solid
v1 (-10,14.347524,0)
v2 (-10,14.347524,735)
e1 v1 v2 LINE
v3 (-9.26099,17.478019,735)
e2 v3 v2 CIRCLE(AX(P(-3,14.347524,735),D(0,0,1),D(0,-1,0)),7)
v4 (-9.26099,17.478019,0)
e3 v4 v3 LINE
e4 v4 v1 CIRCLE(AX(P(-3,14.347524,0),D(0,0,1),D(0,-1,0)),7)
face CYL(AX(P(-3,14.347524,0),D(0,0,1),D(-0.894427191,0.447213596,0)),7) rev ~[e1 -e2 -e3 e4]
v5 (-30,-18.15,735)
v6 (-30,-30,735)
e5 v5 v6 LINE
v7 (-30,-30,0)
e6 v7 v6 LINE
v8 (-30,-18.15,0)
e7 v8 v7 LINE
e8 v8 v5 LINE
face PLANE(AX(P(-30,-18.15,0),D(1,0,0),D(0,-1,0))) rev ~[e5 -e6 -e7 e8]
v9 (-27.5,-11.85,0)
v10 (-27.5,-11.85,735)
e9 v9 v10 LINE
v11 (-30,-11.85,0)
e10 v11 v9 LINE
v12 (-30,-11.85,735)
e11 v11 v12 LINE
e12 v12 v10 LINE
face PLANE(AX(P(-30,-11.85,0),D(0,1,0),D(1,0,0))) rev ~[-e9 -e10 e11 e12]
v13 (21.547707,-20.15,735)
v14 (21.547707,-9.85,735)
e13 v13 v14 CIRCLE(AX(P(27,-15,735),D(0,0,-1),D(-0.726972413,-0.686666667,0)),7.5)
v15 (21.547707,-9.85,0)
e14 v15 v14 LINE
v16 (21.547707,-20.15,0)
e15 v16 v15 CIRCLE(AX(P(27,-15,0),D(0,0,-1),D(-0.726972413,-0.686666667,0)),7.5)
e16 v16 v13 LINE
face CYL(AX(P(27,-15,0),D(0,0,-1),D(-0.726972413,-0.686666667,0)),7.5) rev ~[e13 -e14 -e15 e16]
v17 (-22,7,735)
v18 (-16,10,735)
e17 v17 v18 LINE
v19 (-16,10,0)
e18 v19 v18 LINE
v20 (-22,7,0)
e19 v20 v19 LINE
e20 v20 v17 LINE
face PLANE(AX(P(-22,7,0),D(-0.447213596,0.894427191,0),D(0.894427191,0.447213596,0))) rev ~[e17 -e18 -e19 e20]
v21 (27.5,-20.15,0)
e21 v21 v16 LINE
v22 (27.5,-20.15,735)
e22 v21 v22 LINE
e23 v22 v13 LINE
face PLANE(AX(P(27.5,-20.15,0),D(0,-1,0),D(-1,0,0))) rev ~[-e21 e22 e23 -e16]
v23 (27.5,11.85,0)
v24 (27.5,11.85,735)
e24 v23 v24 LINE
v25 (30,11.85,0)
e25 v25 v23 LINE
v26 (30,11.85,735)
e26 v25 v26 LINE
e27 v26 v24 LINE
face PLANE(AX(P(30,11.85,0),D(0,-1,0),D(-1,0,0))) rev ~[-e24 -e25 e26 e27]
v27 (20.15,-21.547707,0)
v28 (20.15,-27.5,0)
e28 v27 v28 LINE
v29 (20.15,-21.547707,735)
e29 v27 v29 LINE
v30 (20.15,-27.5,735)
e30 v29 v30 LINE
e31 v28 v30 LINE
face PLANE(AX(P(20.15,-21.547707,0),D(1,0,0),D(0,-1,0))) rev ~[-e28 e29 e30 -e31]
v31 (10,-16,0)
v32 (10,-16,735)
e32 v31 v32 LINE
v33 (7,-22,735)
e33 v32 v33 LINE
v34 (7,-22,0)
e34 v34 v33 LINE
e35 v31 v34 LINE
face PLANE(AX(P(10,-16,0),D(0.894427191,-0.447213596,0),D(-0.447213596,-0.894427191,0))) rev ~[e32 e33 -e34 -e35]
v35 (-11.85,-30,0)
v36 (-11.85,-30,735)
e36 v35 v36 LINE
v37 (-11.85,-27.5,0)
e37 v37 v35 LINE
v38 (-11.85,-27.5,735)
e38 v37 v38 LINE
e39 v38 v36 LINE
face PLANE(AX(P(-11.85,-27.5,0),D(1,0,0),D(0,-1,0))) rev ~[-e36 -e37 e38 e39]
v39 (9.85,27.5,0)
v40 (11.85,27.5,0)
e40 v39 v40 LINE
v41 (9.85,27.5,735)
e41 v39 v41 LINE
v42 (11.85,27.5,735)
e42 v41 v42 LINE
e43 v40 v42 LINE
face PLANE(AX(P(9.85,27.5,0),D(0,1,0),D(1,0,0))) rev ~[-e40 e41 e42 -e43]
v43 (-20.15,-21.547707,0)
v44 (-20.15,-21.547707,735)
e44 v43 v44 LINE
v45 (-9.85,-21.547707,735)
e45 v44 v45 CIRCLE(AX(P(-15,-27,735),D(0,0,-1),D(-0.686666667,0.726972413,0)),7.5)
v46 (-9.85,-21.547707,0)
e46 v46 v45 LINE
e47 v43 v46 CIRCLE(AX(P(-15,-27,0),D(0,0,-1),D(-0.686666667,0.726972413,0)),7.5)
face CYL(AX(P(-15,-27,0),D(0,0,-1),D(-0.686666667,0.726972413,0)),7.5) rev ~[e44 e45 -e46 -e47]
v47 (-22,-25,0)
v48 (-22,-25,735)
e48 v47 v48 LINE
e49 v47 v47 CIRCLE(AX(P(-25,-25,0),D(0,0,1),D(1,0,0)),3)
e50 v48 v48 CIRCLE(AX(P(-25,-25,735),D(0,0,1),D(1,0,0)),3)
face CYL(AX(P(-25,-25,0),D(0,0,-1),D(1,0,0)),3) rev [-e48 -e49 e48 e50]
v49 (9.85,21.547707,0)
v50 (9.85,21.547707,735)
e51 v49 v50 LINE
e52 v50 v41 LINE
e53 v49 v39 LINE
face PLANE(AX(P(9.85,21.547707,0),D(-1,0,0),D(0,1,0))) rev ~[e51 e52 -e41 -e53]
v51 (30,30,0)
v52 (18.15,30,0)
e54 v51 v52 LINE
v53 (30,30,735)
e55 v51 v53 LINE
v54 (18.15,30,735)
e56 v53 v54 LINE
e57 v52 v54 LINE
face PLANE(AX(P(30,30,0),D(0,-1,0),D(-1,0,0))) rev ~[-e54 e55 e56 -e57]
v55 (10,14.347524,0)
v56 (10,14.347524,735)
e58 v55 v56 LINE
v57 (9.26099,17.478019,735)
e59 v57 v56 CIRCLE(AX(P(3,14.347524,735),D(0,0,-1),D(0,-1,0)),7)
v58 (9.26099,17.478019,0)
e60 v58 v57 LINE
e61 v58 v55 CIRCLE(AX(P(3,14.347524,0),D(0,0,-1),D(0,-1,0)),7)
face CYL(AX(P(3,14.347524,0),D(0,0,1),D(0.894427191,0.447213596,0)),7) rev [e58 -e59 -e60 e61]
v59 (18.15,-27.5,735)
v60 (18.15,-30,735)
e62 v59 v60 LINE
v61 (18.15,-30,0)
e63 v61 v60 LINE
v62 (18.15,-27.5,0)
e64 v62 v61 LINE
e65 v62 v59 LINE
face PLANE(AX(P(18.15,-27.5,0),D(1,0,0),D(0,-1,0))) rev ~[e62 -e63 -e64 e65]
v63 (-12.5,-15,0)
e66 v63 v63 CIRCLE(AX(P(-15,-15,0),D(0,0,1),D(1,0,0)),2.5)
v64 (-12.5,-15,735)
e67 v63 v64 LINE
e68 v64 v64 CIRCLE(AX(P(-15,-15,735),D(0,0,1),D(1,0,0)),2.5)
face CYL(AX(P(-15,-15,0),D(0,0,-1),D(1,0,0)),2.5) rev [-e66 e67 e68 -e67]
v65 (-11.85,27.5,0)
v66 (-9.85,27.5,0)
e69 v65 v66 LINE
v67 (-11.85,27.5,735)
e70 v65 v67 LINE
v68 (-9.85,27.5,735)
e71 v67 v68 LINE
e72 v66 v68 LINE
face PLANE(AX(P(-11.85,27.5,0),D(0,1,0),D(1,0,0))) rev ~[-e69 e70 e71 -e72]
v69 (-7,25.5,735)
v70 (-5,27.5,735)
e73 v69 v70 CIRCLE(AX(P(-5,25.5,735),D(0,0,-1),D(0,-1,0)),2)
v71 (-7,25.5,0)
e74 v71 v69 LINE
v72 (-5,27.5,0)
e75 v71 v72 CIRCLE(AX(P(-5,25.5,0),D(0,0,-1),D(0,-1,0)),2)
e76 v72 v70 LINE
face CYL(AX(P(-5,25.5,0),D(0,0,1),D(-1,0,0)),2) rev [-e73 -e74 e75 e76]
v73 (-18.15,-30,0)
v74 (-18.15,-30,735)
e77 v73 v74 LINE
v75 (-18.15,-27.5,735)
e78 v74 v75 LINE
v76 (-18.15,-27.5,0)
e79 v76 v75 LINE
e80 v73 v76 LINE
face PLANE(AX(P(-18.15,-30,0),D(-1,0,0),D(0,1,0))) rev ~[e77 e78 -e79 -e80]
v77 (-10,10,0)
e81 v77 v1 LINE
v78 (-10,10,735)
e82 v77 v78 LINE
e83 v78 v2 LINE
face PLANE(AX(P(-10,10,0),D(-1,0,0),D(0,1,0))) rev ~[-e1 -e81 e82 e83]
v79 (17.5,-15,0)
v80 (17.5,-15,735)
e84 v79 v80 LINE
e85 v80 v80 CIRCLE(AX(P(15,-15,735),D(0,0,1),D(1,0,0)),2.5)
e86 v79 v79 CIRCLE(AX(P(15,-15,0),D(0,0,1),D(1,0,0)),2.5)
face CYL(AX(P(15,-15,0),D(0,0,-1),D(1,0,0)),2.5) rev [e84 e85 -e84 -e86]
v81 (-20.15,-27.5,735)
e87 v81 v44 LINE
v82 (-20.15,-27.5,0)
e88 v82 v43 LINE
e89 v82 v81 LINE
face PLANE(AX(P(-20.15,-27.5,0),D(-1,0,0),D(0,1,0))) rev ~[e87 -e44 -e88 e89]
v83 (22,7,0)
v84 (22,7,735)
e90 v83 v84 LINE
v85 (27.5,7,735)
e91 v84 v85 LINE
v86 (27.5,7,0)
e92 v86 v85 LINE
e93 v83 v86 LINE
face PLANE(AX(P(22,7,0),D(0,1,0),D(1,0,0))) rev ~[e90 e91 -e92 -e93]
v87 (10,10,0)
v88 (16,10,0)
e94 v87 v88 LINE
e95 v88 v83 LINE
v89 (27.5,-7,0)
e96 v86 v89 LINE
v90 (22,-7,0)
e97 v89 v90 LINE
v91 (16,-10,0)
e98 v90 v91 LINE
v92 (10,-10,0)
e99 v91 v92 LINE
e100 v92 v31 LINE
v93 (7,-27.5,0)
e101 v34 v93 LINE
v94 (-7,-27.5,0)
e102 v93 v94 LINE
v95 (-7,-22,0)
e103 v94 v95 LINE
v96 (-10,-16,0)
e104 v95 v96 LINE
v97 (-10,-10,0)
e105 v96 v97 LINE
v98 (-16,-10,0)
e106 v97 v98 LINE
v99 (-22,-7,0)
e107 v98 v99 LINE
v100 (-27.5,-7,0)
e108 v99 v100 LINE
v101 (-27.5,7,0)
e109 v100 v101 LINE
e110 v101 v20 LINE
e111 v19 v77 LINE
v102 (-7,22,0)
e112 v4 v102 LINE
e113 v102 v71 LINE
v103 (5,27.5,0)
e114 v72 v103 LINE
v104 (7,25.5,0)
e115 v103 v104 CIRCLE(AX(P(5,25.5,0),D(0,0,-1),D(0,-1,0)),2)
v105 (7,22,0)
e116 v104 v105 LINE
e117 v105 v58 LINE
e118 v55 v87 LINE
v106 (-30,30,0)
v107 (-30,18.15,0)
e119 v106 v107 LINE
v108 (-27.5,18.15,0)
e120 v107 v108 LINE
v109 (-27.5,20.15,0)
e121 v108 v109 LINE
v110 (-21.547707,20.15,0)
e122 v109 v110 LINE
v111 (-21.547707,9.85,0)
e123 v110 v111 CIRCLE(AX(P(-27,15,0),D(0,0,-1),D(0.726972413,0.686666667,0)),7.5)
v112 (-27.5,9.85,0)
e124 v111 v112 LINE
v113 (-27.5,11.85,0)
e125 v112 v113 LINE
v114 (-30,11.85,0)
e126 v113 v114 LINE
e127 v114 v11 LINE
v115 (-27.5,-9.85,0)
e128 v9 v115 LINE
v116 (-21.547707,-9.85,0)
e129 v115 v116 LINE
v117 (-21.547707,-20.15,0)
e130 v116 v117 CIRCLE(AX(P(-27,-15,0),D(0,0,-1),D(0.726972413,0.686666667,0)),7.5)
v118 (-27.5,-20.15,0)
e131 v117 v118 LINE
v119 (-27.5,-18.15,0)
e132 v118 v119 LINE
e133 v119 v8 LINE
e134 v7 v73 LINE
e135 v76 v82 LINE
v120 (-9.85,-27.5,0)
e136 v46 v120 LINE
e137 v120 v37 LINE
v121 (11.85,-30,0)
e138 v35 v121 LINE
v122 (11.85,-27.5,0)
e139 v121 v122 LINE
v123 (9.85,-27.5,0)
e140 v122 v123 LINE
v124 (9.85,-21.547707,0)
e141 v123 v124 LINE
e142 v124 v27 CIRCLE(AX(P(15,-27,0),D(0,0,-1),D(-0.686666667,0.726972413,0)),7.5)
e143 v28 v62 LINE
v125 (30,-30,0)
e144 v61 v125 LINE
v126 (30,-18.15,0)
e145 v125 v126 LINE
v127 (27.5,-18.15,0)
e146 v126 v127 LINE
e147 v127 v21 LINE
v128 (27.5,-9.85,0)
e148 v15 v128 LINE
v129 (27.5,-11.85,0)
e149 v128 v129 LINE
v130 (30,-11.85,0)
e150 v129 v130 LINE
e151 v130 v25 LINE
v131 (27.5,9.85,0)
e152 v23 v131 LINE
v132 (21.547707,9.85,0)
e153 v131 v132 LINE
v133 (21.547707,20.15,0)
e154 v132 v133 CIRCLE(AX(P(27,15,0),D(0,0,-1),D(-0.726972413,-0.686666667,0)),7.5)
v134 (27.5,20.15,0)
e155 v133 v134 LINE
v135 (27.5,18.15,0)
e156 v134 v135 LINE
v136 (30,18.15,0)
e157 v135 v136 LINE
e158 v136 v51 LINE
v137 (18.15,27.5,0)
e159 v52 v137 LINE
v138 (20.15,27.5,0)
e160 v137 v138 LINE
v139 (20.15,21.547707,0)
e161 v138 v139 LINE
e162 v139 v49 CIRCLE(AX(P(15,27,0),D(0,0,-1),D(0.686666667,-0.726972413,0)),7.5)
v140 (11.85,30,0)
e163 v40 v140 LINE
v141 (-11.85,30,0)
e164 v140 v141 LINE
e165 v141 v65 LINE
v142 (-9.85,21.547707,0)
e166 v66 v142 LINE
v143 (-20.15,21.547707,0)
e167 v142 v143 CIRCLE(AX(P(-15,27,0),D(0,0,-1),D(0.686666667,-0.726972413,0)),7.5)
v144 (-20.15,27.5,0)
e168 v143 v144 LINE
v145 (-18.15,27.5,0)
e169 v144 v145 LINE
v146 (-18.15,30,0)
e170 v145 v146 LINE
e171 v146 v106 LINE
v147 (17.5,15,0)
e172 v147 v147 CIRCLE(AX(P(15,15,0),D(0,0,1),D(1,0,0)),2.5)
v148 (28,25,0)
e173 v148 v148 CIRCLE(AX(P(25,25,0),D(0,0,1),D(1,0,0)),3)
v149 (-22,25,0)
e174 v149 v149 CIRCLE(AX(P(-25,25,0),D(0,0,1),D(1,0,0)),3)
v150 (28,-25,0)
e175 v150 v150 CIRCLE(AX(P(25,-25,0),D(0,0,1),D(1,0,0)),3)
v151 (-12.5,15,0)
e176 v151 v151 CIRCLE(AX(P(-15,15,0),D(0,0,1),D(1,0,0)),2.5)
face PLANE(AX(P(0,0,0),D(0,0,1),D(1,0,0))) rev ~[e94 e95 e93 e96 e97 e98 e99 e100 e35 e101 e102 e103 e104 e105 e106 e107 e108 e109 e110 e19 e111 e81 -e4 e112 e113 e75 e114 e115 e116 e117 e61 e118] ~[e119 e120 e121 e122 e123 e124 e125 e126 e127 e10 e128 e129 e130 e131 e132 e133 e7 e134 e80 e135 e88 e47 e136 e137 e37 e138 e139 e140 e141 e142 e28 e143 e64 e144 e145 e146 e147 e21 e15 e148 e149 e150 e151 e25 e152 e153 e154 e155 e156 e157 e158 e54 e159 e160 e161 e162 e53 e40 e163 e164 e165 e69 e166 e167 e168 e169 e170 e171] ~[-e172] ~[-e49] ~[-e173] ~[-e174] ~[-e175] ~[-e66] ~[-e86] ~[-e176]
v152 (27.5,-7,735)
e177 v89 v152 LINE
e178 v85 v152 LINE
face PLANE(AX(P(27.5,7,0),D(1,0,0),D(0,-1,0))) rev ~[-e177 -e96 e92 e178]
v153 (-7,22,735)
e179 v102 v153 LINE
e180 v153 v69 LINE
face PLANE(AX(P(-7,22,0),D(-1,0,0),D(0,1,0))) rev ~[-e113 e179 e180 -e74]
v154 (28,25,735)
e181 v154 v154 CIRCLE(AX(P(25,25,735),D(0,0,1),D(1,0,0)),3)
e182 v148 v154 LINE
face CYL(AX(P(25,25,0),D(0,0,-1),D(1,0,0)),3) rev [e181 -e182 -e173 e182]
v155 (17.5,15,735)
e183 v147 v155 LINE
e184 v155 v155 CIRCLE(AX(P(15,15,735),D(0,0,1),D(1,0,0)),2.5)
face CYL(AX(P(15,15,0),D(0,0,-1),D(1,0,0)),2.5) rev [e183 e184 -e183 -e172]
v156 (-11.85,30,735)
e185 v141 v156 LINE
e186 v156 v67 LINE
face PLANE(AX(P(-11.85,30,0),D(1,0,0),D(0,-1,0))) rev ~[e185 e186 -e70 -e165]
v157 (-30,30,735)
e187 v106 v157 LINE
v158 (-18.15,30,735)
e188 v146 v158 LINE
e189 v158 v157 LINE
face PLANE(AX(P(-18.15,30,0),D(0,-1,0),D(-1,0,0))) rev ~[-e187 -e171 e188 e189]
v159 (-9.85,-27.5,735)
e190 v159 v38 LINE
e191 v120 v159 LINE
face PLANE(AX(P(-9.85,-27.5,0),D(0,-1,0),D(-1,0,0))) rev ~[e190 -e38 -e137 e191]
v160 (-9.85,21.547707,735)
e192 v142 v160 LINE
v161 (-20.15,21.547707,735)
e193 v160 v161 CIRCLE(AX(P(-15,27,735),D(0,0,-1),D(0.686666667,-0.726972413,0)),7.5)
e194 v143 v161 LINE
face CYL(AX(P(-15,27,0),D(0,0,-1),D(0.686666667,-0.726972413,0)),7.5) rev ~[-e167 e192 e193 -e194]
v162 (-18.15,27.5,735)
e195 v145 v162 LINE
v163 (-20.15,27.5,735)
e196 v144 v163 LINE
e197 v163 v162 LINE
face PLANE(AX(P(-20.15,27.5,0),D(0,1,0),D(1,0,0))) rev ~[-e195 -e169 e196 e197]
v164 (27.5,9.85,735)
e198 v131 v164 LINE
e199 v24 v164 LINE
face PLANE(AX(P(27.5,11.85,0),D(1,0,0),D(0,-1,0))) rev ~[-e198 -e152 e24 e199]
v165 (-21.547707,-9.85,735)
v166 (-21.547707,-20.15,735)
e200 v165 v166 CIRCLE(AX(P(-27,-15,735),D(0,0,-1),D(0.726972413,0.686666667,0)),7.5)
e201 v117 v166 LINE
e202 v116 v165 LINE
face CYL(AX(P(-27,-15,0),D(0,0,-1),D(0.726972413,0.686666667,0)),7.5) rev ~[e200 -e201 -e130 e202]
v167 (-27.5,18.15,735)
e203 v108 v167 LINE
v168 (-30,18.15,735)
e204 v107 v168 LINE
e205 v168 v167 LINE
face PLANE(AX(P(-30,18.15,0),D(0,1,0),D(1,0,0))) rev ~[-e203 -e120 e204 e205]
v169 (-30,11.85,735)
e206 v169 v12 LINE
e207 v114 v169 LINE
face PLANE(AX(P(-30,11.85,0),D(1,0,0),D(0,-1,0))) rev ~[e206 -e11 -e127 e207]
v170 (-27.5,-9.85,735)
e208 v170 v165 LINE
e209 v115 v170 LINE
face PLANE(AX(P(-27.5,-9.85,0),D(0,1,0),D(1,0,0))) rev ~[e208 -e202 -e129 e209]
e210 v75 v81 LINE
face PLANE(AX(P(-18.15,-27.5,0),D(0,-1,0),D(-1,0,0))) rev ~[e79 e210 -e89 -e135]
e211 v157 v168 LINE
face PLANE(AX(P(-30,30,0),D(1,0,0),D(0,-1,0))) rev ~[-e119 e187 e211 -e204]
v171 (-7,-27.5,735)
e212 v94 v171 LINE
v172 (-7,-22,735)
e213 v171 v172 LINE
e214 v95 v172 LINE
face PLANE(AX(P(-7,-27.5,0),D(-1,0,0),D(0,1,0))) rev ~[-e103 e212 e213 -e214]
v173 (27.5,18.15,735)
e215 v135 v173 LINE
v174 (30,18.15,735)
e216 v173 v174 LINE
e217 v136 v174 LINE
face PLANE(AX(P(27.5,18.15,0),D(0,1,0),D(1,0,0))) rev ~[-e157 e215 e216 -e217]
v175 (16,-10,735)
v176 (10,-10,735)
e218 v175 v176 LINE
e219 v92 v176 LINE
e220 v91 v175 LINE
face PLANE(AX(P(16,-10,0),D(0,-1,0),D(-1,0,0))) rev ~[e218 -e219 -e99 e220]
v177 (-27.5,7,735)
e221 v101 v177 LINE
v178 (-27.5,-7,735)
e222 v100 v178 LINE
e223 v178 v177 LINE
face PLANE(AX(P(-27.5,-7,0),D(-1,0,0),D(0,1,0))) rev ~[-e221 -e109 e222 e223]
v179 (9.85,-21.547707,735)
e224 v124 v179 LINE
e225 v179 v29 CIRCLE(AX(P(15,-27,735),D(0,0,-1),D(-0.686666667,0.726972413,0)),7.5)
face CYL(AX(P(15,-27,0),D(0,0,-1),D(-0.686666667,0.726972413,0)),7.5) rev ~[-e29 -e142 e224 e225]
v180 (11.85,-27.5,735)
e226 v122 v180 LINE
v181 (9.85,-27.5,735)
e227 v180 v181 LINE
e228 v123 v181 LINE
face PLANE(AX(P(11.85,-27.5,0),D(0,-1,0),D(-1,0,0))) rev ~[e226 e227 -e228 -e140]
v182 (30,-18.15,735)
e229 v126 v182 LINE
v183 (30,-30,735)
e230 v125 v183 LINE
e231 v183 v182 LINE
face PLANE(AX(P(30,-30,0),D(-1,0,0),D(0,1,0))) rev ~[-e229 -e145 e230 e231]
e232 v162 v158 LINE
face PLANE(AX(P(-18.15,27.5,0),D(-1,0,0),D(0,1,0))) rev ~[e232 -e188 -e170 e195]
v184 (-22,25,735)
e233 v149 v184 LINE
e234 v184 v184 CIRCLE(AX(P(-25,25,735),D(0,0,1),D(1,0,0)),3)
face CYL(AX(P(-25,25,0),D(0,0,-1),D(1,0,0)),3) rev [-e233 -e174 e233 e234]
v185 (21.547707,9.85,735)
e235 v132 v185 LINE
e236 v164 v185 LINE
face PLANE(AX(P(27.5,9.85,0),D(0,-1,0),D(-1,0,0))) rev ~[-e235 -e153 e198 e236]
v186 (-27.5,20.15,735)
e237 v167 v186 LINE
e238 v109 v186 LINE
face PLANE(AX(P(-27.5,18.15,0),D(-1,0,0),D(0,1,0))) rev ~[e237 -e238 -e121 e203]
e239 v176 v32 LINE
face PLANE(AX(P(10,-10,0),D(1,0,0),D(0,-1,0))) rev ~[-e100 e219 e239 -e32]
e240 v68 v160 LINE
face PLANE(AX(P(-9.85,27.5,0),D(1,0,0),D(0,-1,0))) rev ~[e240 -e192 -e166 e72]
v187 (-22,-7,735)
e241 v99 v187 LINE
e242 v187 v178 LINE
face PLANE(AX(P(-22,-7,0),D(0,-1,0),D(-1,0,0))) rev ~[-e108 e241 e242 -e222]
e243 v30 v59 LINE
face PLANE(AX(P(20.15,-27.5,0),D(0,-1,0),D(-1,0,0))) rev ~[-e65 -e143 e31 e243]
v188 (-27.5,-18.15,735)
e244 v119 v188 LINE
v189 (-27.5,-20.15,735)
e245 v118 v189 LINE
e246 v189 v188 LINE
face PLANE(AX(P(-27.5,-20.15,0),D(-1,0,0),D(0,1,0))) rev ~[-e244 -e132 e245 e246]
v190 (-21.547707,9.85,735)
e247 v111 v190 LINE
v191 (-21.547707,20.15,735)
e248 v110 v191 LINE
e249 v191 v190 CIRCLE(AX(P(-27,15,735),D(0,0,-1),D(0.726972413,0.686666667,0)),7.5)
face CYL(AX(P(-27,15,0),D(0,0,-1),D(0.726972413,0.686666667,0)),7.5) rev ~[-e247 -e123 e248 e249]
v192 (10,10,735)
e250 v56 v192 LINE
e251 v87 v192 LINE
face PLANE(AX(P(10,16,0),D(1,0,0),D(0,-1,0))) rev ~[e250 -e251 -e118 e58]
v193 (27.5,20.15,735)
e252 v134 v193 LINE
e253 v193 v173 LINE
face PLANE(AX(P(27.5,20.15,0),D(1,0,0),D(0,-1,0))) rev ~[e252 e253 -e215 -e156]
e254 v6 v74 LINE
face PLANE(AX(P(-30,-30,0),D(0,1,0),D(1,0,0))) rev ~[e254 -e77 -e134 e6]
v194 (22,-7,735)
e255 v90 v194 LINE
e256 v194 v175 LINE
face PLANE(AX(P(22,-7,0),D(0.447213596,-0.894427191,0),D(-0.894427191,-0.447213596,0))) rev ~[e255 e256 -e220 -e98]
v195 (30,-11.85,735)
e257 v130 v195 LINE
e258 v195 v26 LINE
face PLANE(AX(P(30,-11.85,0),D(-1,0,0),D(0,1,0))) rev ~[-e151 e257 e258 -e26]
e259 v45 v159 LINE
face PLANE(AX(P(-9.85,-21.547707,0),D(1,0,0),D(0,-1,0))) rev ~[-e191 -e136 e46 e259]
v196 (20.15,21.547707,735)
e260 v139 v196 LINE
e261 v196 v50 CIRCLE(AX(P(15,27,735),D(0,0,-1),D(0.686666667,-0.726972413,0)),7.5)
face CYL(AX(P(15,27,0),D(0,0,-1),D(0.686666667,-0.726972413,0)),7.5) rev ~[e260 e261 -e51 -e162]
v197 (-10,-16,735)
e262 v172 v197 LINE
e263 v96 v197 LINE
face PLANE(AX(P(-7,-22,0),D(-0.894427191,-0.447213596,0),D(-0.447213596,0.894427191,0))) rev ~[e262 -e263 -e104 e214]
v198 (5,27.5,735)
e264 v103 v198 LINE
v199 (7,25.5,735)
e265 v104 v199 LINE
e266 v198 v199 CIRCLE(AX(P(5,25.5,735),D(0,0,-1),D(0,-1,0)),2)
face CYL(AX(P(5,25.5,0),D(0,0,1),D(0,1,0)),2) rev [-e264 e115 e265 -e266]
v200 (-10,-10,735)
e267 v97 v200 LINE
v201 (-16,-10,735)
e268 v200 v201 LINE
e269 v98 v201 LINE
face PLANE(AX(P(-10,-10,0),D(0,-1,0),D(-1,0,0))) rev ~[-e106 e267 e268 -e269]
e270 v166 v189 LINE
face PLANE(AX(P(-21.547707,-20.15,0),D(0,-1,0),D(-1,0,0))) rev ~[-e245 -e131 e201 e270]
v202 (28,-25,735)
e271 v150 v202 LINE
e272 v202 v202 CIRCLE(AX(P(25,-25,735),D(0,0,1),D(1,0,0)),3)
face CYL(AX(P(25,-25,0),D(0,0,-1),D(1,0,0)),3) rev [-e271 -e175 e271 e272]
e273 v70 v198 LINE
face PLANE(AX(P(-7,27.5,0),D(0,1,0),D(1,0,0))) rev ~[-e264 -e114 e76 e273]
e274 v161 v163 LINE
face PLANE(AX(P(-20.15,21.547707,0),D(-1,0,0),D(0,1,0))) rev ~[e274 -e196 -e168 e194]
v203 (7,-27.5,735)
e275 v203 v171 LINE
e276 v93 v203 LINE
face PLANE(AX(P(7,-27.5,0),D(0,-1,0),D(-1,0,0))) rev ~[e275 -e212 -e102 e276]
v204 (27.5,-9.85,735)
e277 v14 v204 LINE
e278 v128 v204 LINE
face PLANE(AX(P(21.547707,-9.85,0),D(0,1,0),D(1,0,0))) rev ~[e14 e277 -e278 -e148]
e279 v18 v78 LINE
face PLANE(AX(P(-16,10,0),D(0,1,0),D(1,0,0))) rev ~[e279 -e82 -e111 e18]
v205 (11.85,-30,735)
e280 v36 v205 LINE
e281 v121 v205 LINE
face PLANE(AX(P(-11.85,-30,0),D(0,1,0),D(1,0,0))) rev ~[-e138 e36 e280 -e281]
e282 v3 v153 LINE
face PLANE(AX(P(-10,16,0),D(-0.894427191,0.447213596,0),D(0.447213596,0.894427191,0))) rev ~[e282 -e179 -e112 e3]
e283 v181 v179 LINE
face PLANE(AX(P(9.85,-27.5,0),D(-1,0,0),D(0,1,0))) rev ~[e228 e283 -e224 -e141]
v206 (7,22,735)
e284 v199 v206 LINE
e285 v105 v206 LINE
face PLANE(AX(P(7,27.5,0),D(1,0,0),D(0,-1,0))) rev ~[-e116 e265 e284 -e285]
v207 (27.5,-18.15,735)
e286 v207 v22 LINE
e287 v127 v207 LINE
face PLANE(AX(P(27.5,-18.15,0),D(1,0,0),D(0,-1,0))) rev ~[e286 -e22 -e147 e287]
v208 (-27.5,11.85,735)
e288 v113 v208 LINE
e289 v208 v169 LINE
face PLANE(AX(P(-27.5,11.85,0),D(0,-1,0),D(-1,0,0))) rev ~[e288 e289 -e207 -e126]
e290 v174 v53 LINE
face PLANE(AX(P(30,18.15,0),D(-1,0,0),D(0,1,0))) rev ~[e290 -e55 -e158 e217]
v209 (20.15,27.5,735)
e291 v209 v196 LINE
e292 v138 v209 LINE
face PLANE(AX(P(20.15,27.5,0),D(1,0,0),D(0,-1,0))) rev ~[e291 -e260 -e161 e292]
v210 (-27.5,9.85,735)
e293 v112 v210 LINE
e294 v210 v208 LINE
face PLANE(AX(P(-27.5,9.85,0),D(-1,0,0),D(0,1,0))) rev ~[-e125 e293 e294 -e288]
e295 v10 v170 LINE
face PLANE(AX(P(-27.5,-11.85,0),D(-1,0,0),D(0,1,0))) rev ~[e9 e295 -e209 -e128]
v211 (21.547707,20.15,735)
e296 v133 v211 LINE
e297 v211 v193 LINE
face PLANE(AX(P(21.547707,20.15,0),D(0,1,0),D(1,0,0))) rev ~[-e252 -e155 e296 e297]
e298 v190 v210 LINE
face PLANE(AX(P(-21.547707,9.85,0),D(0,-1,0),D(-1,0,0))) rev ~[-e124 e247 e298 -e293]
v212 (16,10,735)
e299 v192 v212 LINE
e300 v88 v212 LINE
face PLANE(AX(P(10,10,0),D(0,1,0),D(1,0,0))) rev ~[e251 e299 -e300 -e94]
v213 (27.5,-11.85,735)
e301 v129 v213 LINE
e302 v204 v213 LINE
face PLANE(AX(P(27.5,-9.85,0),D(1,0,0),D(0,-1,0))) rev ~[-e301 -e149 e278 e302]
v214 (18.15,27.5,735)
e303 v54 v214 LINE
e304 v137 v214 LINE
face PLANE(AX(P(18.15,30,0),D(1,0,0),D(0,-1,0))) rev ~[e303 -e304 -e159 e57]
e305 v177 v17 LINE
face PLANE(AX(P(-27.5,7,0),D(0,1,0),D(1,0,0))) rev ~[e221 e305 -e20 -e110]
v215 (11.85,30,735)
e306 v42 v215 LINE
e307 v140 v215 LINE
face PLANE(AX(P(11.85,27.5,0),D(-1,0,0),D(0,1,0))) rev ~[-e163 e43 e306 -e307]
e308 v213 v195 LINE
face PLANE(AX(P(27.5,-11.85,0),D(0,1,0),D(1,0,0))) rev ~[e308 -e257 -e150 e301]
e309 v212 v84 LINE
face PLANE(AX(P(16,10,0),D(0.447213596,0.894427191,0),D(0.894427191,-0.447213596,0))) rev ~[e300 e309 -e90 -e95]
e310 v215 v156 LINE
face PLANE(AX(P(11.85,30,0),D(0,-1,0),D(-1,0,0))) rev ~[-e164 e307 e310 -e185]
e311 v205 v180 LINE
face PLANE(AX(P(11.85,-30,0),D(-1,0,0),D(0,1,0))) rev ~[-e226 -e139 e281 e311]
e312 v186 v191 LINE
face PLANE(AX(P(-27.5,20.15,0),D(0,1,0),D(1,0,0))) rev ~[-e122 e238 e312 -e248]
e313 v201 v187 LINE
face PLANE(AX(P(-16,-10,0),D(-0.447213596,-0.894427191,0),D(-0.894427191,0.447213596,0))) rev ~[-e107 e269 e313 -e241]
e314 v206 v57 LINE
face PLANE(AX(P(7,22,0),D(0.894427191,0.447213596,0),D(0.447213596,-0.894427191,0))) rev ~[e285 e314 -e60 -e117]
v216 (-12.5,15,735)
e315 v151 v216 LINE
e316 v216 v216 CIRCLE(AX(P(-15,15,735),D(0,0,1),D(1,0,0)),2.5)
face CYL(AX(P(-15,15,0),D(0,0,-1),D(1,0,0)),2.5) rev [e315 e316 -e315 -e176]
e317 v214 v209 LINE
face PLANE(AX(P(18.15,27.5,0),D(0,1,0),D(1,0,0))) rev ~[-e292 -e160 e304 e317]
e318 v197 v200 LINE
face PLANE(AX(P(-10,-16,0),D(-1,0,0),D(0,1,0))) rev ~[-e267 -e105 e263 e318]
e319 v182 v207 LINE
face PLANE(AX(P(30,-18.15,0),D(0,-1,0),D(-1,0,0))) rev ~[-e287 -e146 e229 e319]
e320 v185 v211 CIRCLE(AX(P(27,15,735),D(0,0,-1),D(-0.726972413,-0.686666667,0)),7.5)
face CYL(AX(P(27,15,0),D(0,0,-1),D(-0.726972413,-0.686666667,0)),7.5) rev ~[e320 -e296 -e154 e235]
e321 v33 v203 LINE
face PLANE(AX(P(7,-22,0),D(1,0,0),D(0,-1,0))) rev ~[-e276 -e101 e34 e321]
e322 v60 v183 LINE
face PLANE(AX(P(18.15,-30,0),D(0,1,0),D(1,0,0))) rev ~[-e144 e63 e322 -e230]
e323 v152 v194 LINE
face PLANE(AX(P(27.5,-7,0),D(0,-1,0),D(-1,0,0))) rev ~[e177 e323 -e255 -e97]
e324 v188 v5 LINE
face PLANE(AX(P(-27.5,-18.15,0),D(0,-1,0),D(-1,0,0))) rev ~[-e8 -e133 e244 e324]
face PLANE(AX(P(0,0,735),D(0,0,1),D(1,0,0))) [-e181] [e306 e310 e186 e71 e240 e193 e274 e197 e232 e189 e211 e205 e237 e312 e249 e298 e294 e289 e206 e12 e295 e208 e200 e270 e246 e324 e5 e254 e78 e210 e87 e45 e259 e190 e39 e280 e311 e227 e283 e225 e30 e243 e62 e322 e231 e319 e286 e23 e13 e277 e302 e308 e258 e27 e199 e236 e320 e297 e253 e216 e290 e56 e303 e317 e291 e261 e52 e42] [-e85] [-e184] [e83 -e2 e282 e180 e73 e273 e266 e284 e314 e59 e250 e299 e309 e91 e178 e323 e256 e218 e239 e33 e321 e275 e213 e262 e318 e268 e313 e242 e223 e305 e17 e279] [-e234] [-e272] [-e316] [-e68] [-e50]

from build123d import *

# Parameters (mm, degrees)
F0_R     = 3
F0_R_2   = 2.5
F1_DEPTH = 735
F2_R     = 2
F3_R     = 7


# Not quite as in the source:
# - a feature names something its author has since deleted; it is built from what else it names


with BuildPart() as f1:
    # F0 (on Top) → F1 (new body)
    with BuildSketch(Plane.XY):
        with BuildLine():
            Line((18.15, -30), (30, -30))
            Line((30, -30), (30, -18.15))
            Line((30, -18.15), (27.5, -18.15))
            Line((27.5, -18.15), (27.5, -20.15))
            Line((27.5, -20.15), (21.5477069044, -20.15))
            ThreePointArc((21.5477069044, -20.15), (19.5, -15), (21.5477069044, -9.85))
            Line((21.5477069044, -9.85), (27.5, -9.85))
            Line((27.5, -9.85), (27.5, -11.85))
            Line((27.5, -11.85), (30, -11.85))
            Line((30, -11.85), (30, 11.85))
            Line((30, 11.85), (27.5, 11.85))
            Line((27.5, 11.85), (27.5, 9.85))
            Line((27.5, 9.85), (21.5477069044, 9.85))
            ThreePointArc((21.5477069044, 9.85), (19.5, 15), (21.5477069044, 20.15))
            Line((21.5477069044, 20.15), (27.5, 20.15))
            Line((27.5, 20.15), (27.5, 18.15))
            Line((27.5, 18.15), (30, 18.15))
            Line((30, 18.15), (30, 30))
            Line((30, 30), (18.15, 30))
            Line((18.15, 30), (18.15, 27.5))
            Line((18.15, 27.5), (20.15, 27.5))
            Line((20.15, 27.5), (20.15, 21.5477069044))
            ThreePointArc((20.15, 21.5477069044), (15, 19.5), (9.85, 21.5477069044))
            Line((9.85, 21.5477069044), (9.85, 27.5))
            Line((9.85, 27.5), (11.85, 27.5))
            Line((11.85, 27.5), (11.85, 30))
            Line((11.85, 30), (-11.85, 30))
            Line((-11.85, 30), (-11.85, 27.5))
            Line((-11.85, 27.5), (-9.85, 27.5))
            Line((-9.85, 27.5), (-9.85, 21.5477069044))
            ThreePointArc((-9.85, 21.5477069044), (-15, 19.5), (-20.15, 21.5477069044))
            Line((-20.15, 21.5477069044), (-20.15, 27.5))
            Line((-20.15, 27.5), (-18.15, 27.5))
            Line((-18.15, 27.5), (-18.15, 30))
            Line((-18.15, 30), (-30, 30))
            Line((-30, 30), (-30, 18.15))
            Line((-30, 18.15), (-27.5, 18.15))
            Line((-27.5, 18.15), (-27.5, 20.15))
            Line((-27.5, 20.15), (-21.5477069044, 20.15))
            ThreePointArc((-21.5477069044, 20.15), (-19.5, 15), (-21.5477069044, 9.85))
            Line((-21.5477069044, 9.85), (-27.5, 9.85))
            Line((-27.5, 9.85), (-27.5, 11.85))
            Line((-27.5, 11.85), (-30, 11.85))
            Line((-30, 11.85), (-30, -11.85))
            Line((-30, -11.85), (-27.5, -11.85))
            Line((-27.5, -11.85), (-27.5, -9.85))
            Line((-27.5, -9.85), (-21.5477069044, -9.85))
            ThreePointArc((-21.5477069044, -9.85), (-19.5, -15), (-21.5477069044, -20.15))
            Line((-21.5477069044, -20.15), (-27.5, -20.15))
            Line((-27.5, -20.15), (-27.5, -18.15))
            Line((-27.5, -18.15), (-30, -18.15))
            Line((-30, -18.15), (-30, -30))
            Line((-30, -30), (-18.15, -30))
            Line((-18.15, -30), (-18.15, -27.5))
            Line((-18.15, -27.5), (-20.15, -27.5))
            Line((-20.15, -27.5), (-20.15, -21.5477069044))
            ThreePointArc((-20.15, -21.5477069044), (-15, -19.5), (-9.85, -21.5477069044))
            Line((-9.85, -21.5477069044), (-9.85, -27.5))
            Line((-9.85, -27.5), (-11.85, -27.5))
            Line((-11.85, -27.5), (-11.85, -30))
            Line((-11.85, -30), (11.85, -30))
            Line((11.85, -30), (11.85, -27.5))
            Line((11.85, -27.5), (9.85, -27.5))
            Line((9.85, -27.5), (9.85, -21.5477069044))
            ThreePointArc((9.85, -21.5477069044), (15, -19.5), (20.15, -21.5477069044))
            Line((20.15, -21.5477069044), (20.15, -27.5))
            Line((20.15, -27.5), (18.15, -27.5))
            Line((18.15, -27.5), (18.15, -30))
        make_face()
        with Locations((-25, -25)):
            Circle(F0_R, mode=Mode.SUBTRACT)
        with Locations((-15, -15)):
            Circle(F0_R_2, mode=Mode.SUBTRACT)
        with Locations((25, -25)):
            Circle(F0_R, mode=Mode.SUBTRACT)
        with Locations((15, -15)):
            Circle(F0_R_2, mode=Mode.SUBTRACT)
        with Locations((-25, 25)):
            Circle(F0_R, mode=Mode.SUBTRACT)
        with Locations((-15, 15)):
            Circle(F0_R_2, mode=Mode.SUBTRACT)
        Polygon((-7, 22), (-7, 27.5), (0, 27.5), (7, 27.5), (7, 22), (10, 16), (10, 10), (16, 10), (22, 7), (27.5, 7), (27.5, 0), (27.5, -7), (22, -7), (16, -10), (10, -10), (10, -16), (7, -22), (7, -27.5), (0, -27.5), (-7, -27.5), (-7, -22), (-10, -16), (-10, -10), (-16, -10), (-22, -7), (-27.5, -7), (-27.5, 0), (-27.5, 7), (-22, 7), (-16, 10), (-10, 10), (-10, 16), align=None, mode=Mode.SUBTRACT)
        with Locations((15, 15)):
            Circle(F0_R_2, mode=Mode.SUBTRACT)
        with Locations((25, 25)):
            Circle(F0_R, mode=Mode.SUBTRACT)
    extrude(amount=F1_DEPTH)

    # F2
    f2_edges = [f1.edges().sort_by_distance(p)[0] for p in [
        (-7, 27.5, 367.5),
        (7, 27.5, 367.5),
    ]]
    fillet(f2_edges, radius=F2_R)

    # F3
    f3_edges = [f1.edges().sort_by_distance(p)[0] for p in [
        (-10, 16, 367.5),
        (10, 16, 367.5),
    ]]
    fillet(f3_edges, radius=F3_R)


solid = f1.part
